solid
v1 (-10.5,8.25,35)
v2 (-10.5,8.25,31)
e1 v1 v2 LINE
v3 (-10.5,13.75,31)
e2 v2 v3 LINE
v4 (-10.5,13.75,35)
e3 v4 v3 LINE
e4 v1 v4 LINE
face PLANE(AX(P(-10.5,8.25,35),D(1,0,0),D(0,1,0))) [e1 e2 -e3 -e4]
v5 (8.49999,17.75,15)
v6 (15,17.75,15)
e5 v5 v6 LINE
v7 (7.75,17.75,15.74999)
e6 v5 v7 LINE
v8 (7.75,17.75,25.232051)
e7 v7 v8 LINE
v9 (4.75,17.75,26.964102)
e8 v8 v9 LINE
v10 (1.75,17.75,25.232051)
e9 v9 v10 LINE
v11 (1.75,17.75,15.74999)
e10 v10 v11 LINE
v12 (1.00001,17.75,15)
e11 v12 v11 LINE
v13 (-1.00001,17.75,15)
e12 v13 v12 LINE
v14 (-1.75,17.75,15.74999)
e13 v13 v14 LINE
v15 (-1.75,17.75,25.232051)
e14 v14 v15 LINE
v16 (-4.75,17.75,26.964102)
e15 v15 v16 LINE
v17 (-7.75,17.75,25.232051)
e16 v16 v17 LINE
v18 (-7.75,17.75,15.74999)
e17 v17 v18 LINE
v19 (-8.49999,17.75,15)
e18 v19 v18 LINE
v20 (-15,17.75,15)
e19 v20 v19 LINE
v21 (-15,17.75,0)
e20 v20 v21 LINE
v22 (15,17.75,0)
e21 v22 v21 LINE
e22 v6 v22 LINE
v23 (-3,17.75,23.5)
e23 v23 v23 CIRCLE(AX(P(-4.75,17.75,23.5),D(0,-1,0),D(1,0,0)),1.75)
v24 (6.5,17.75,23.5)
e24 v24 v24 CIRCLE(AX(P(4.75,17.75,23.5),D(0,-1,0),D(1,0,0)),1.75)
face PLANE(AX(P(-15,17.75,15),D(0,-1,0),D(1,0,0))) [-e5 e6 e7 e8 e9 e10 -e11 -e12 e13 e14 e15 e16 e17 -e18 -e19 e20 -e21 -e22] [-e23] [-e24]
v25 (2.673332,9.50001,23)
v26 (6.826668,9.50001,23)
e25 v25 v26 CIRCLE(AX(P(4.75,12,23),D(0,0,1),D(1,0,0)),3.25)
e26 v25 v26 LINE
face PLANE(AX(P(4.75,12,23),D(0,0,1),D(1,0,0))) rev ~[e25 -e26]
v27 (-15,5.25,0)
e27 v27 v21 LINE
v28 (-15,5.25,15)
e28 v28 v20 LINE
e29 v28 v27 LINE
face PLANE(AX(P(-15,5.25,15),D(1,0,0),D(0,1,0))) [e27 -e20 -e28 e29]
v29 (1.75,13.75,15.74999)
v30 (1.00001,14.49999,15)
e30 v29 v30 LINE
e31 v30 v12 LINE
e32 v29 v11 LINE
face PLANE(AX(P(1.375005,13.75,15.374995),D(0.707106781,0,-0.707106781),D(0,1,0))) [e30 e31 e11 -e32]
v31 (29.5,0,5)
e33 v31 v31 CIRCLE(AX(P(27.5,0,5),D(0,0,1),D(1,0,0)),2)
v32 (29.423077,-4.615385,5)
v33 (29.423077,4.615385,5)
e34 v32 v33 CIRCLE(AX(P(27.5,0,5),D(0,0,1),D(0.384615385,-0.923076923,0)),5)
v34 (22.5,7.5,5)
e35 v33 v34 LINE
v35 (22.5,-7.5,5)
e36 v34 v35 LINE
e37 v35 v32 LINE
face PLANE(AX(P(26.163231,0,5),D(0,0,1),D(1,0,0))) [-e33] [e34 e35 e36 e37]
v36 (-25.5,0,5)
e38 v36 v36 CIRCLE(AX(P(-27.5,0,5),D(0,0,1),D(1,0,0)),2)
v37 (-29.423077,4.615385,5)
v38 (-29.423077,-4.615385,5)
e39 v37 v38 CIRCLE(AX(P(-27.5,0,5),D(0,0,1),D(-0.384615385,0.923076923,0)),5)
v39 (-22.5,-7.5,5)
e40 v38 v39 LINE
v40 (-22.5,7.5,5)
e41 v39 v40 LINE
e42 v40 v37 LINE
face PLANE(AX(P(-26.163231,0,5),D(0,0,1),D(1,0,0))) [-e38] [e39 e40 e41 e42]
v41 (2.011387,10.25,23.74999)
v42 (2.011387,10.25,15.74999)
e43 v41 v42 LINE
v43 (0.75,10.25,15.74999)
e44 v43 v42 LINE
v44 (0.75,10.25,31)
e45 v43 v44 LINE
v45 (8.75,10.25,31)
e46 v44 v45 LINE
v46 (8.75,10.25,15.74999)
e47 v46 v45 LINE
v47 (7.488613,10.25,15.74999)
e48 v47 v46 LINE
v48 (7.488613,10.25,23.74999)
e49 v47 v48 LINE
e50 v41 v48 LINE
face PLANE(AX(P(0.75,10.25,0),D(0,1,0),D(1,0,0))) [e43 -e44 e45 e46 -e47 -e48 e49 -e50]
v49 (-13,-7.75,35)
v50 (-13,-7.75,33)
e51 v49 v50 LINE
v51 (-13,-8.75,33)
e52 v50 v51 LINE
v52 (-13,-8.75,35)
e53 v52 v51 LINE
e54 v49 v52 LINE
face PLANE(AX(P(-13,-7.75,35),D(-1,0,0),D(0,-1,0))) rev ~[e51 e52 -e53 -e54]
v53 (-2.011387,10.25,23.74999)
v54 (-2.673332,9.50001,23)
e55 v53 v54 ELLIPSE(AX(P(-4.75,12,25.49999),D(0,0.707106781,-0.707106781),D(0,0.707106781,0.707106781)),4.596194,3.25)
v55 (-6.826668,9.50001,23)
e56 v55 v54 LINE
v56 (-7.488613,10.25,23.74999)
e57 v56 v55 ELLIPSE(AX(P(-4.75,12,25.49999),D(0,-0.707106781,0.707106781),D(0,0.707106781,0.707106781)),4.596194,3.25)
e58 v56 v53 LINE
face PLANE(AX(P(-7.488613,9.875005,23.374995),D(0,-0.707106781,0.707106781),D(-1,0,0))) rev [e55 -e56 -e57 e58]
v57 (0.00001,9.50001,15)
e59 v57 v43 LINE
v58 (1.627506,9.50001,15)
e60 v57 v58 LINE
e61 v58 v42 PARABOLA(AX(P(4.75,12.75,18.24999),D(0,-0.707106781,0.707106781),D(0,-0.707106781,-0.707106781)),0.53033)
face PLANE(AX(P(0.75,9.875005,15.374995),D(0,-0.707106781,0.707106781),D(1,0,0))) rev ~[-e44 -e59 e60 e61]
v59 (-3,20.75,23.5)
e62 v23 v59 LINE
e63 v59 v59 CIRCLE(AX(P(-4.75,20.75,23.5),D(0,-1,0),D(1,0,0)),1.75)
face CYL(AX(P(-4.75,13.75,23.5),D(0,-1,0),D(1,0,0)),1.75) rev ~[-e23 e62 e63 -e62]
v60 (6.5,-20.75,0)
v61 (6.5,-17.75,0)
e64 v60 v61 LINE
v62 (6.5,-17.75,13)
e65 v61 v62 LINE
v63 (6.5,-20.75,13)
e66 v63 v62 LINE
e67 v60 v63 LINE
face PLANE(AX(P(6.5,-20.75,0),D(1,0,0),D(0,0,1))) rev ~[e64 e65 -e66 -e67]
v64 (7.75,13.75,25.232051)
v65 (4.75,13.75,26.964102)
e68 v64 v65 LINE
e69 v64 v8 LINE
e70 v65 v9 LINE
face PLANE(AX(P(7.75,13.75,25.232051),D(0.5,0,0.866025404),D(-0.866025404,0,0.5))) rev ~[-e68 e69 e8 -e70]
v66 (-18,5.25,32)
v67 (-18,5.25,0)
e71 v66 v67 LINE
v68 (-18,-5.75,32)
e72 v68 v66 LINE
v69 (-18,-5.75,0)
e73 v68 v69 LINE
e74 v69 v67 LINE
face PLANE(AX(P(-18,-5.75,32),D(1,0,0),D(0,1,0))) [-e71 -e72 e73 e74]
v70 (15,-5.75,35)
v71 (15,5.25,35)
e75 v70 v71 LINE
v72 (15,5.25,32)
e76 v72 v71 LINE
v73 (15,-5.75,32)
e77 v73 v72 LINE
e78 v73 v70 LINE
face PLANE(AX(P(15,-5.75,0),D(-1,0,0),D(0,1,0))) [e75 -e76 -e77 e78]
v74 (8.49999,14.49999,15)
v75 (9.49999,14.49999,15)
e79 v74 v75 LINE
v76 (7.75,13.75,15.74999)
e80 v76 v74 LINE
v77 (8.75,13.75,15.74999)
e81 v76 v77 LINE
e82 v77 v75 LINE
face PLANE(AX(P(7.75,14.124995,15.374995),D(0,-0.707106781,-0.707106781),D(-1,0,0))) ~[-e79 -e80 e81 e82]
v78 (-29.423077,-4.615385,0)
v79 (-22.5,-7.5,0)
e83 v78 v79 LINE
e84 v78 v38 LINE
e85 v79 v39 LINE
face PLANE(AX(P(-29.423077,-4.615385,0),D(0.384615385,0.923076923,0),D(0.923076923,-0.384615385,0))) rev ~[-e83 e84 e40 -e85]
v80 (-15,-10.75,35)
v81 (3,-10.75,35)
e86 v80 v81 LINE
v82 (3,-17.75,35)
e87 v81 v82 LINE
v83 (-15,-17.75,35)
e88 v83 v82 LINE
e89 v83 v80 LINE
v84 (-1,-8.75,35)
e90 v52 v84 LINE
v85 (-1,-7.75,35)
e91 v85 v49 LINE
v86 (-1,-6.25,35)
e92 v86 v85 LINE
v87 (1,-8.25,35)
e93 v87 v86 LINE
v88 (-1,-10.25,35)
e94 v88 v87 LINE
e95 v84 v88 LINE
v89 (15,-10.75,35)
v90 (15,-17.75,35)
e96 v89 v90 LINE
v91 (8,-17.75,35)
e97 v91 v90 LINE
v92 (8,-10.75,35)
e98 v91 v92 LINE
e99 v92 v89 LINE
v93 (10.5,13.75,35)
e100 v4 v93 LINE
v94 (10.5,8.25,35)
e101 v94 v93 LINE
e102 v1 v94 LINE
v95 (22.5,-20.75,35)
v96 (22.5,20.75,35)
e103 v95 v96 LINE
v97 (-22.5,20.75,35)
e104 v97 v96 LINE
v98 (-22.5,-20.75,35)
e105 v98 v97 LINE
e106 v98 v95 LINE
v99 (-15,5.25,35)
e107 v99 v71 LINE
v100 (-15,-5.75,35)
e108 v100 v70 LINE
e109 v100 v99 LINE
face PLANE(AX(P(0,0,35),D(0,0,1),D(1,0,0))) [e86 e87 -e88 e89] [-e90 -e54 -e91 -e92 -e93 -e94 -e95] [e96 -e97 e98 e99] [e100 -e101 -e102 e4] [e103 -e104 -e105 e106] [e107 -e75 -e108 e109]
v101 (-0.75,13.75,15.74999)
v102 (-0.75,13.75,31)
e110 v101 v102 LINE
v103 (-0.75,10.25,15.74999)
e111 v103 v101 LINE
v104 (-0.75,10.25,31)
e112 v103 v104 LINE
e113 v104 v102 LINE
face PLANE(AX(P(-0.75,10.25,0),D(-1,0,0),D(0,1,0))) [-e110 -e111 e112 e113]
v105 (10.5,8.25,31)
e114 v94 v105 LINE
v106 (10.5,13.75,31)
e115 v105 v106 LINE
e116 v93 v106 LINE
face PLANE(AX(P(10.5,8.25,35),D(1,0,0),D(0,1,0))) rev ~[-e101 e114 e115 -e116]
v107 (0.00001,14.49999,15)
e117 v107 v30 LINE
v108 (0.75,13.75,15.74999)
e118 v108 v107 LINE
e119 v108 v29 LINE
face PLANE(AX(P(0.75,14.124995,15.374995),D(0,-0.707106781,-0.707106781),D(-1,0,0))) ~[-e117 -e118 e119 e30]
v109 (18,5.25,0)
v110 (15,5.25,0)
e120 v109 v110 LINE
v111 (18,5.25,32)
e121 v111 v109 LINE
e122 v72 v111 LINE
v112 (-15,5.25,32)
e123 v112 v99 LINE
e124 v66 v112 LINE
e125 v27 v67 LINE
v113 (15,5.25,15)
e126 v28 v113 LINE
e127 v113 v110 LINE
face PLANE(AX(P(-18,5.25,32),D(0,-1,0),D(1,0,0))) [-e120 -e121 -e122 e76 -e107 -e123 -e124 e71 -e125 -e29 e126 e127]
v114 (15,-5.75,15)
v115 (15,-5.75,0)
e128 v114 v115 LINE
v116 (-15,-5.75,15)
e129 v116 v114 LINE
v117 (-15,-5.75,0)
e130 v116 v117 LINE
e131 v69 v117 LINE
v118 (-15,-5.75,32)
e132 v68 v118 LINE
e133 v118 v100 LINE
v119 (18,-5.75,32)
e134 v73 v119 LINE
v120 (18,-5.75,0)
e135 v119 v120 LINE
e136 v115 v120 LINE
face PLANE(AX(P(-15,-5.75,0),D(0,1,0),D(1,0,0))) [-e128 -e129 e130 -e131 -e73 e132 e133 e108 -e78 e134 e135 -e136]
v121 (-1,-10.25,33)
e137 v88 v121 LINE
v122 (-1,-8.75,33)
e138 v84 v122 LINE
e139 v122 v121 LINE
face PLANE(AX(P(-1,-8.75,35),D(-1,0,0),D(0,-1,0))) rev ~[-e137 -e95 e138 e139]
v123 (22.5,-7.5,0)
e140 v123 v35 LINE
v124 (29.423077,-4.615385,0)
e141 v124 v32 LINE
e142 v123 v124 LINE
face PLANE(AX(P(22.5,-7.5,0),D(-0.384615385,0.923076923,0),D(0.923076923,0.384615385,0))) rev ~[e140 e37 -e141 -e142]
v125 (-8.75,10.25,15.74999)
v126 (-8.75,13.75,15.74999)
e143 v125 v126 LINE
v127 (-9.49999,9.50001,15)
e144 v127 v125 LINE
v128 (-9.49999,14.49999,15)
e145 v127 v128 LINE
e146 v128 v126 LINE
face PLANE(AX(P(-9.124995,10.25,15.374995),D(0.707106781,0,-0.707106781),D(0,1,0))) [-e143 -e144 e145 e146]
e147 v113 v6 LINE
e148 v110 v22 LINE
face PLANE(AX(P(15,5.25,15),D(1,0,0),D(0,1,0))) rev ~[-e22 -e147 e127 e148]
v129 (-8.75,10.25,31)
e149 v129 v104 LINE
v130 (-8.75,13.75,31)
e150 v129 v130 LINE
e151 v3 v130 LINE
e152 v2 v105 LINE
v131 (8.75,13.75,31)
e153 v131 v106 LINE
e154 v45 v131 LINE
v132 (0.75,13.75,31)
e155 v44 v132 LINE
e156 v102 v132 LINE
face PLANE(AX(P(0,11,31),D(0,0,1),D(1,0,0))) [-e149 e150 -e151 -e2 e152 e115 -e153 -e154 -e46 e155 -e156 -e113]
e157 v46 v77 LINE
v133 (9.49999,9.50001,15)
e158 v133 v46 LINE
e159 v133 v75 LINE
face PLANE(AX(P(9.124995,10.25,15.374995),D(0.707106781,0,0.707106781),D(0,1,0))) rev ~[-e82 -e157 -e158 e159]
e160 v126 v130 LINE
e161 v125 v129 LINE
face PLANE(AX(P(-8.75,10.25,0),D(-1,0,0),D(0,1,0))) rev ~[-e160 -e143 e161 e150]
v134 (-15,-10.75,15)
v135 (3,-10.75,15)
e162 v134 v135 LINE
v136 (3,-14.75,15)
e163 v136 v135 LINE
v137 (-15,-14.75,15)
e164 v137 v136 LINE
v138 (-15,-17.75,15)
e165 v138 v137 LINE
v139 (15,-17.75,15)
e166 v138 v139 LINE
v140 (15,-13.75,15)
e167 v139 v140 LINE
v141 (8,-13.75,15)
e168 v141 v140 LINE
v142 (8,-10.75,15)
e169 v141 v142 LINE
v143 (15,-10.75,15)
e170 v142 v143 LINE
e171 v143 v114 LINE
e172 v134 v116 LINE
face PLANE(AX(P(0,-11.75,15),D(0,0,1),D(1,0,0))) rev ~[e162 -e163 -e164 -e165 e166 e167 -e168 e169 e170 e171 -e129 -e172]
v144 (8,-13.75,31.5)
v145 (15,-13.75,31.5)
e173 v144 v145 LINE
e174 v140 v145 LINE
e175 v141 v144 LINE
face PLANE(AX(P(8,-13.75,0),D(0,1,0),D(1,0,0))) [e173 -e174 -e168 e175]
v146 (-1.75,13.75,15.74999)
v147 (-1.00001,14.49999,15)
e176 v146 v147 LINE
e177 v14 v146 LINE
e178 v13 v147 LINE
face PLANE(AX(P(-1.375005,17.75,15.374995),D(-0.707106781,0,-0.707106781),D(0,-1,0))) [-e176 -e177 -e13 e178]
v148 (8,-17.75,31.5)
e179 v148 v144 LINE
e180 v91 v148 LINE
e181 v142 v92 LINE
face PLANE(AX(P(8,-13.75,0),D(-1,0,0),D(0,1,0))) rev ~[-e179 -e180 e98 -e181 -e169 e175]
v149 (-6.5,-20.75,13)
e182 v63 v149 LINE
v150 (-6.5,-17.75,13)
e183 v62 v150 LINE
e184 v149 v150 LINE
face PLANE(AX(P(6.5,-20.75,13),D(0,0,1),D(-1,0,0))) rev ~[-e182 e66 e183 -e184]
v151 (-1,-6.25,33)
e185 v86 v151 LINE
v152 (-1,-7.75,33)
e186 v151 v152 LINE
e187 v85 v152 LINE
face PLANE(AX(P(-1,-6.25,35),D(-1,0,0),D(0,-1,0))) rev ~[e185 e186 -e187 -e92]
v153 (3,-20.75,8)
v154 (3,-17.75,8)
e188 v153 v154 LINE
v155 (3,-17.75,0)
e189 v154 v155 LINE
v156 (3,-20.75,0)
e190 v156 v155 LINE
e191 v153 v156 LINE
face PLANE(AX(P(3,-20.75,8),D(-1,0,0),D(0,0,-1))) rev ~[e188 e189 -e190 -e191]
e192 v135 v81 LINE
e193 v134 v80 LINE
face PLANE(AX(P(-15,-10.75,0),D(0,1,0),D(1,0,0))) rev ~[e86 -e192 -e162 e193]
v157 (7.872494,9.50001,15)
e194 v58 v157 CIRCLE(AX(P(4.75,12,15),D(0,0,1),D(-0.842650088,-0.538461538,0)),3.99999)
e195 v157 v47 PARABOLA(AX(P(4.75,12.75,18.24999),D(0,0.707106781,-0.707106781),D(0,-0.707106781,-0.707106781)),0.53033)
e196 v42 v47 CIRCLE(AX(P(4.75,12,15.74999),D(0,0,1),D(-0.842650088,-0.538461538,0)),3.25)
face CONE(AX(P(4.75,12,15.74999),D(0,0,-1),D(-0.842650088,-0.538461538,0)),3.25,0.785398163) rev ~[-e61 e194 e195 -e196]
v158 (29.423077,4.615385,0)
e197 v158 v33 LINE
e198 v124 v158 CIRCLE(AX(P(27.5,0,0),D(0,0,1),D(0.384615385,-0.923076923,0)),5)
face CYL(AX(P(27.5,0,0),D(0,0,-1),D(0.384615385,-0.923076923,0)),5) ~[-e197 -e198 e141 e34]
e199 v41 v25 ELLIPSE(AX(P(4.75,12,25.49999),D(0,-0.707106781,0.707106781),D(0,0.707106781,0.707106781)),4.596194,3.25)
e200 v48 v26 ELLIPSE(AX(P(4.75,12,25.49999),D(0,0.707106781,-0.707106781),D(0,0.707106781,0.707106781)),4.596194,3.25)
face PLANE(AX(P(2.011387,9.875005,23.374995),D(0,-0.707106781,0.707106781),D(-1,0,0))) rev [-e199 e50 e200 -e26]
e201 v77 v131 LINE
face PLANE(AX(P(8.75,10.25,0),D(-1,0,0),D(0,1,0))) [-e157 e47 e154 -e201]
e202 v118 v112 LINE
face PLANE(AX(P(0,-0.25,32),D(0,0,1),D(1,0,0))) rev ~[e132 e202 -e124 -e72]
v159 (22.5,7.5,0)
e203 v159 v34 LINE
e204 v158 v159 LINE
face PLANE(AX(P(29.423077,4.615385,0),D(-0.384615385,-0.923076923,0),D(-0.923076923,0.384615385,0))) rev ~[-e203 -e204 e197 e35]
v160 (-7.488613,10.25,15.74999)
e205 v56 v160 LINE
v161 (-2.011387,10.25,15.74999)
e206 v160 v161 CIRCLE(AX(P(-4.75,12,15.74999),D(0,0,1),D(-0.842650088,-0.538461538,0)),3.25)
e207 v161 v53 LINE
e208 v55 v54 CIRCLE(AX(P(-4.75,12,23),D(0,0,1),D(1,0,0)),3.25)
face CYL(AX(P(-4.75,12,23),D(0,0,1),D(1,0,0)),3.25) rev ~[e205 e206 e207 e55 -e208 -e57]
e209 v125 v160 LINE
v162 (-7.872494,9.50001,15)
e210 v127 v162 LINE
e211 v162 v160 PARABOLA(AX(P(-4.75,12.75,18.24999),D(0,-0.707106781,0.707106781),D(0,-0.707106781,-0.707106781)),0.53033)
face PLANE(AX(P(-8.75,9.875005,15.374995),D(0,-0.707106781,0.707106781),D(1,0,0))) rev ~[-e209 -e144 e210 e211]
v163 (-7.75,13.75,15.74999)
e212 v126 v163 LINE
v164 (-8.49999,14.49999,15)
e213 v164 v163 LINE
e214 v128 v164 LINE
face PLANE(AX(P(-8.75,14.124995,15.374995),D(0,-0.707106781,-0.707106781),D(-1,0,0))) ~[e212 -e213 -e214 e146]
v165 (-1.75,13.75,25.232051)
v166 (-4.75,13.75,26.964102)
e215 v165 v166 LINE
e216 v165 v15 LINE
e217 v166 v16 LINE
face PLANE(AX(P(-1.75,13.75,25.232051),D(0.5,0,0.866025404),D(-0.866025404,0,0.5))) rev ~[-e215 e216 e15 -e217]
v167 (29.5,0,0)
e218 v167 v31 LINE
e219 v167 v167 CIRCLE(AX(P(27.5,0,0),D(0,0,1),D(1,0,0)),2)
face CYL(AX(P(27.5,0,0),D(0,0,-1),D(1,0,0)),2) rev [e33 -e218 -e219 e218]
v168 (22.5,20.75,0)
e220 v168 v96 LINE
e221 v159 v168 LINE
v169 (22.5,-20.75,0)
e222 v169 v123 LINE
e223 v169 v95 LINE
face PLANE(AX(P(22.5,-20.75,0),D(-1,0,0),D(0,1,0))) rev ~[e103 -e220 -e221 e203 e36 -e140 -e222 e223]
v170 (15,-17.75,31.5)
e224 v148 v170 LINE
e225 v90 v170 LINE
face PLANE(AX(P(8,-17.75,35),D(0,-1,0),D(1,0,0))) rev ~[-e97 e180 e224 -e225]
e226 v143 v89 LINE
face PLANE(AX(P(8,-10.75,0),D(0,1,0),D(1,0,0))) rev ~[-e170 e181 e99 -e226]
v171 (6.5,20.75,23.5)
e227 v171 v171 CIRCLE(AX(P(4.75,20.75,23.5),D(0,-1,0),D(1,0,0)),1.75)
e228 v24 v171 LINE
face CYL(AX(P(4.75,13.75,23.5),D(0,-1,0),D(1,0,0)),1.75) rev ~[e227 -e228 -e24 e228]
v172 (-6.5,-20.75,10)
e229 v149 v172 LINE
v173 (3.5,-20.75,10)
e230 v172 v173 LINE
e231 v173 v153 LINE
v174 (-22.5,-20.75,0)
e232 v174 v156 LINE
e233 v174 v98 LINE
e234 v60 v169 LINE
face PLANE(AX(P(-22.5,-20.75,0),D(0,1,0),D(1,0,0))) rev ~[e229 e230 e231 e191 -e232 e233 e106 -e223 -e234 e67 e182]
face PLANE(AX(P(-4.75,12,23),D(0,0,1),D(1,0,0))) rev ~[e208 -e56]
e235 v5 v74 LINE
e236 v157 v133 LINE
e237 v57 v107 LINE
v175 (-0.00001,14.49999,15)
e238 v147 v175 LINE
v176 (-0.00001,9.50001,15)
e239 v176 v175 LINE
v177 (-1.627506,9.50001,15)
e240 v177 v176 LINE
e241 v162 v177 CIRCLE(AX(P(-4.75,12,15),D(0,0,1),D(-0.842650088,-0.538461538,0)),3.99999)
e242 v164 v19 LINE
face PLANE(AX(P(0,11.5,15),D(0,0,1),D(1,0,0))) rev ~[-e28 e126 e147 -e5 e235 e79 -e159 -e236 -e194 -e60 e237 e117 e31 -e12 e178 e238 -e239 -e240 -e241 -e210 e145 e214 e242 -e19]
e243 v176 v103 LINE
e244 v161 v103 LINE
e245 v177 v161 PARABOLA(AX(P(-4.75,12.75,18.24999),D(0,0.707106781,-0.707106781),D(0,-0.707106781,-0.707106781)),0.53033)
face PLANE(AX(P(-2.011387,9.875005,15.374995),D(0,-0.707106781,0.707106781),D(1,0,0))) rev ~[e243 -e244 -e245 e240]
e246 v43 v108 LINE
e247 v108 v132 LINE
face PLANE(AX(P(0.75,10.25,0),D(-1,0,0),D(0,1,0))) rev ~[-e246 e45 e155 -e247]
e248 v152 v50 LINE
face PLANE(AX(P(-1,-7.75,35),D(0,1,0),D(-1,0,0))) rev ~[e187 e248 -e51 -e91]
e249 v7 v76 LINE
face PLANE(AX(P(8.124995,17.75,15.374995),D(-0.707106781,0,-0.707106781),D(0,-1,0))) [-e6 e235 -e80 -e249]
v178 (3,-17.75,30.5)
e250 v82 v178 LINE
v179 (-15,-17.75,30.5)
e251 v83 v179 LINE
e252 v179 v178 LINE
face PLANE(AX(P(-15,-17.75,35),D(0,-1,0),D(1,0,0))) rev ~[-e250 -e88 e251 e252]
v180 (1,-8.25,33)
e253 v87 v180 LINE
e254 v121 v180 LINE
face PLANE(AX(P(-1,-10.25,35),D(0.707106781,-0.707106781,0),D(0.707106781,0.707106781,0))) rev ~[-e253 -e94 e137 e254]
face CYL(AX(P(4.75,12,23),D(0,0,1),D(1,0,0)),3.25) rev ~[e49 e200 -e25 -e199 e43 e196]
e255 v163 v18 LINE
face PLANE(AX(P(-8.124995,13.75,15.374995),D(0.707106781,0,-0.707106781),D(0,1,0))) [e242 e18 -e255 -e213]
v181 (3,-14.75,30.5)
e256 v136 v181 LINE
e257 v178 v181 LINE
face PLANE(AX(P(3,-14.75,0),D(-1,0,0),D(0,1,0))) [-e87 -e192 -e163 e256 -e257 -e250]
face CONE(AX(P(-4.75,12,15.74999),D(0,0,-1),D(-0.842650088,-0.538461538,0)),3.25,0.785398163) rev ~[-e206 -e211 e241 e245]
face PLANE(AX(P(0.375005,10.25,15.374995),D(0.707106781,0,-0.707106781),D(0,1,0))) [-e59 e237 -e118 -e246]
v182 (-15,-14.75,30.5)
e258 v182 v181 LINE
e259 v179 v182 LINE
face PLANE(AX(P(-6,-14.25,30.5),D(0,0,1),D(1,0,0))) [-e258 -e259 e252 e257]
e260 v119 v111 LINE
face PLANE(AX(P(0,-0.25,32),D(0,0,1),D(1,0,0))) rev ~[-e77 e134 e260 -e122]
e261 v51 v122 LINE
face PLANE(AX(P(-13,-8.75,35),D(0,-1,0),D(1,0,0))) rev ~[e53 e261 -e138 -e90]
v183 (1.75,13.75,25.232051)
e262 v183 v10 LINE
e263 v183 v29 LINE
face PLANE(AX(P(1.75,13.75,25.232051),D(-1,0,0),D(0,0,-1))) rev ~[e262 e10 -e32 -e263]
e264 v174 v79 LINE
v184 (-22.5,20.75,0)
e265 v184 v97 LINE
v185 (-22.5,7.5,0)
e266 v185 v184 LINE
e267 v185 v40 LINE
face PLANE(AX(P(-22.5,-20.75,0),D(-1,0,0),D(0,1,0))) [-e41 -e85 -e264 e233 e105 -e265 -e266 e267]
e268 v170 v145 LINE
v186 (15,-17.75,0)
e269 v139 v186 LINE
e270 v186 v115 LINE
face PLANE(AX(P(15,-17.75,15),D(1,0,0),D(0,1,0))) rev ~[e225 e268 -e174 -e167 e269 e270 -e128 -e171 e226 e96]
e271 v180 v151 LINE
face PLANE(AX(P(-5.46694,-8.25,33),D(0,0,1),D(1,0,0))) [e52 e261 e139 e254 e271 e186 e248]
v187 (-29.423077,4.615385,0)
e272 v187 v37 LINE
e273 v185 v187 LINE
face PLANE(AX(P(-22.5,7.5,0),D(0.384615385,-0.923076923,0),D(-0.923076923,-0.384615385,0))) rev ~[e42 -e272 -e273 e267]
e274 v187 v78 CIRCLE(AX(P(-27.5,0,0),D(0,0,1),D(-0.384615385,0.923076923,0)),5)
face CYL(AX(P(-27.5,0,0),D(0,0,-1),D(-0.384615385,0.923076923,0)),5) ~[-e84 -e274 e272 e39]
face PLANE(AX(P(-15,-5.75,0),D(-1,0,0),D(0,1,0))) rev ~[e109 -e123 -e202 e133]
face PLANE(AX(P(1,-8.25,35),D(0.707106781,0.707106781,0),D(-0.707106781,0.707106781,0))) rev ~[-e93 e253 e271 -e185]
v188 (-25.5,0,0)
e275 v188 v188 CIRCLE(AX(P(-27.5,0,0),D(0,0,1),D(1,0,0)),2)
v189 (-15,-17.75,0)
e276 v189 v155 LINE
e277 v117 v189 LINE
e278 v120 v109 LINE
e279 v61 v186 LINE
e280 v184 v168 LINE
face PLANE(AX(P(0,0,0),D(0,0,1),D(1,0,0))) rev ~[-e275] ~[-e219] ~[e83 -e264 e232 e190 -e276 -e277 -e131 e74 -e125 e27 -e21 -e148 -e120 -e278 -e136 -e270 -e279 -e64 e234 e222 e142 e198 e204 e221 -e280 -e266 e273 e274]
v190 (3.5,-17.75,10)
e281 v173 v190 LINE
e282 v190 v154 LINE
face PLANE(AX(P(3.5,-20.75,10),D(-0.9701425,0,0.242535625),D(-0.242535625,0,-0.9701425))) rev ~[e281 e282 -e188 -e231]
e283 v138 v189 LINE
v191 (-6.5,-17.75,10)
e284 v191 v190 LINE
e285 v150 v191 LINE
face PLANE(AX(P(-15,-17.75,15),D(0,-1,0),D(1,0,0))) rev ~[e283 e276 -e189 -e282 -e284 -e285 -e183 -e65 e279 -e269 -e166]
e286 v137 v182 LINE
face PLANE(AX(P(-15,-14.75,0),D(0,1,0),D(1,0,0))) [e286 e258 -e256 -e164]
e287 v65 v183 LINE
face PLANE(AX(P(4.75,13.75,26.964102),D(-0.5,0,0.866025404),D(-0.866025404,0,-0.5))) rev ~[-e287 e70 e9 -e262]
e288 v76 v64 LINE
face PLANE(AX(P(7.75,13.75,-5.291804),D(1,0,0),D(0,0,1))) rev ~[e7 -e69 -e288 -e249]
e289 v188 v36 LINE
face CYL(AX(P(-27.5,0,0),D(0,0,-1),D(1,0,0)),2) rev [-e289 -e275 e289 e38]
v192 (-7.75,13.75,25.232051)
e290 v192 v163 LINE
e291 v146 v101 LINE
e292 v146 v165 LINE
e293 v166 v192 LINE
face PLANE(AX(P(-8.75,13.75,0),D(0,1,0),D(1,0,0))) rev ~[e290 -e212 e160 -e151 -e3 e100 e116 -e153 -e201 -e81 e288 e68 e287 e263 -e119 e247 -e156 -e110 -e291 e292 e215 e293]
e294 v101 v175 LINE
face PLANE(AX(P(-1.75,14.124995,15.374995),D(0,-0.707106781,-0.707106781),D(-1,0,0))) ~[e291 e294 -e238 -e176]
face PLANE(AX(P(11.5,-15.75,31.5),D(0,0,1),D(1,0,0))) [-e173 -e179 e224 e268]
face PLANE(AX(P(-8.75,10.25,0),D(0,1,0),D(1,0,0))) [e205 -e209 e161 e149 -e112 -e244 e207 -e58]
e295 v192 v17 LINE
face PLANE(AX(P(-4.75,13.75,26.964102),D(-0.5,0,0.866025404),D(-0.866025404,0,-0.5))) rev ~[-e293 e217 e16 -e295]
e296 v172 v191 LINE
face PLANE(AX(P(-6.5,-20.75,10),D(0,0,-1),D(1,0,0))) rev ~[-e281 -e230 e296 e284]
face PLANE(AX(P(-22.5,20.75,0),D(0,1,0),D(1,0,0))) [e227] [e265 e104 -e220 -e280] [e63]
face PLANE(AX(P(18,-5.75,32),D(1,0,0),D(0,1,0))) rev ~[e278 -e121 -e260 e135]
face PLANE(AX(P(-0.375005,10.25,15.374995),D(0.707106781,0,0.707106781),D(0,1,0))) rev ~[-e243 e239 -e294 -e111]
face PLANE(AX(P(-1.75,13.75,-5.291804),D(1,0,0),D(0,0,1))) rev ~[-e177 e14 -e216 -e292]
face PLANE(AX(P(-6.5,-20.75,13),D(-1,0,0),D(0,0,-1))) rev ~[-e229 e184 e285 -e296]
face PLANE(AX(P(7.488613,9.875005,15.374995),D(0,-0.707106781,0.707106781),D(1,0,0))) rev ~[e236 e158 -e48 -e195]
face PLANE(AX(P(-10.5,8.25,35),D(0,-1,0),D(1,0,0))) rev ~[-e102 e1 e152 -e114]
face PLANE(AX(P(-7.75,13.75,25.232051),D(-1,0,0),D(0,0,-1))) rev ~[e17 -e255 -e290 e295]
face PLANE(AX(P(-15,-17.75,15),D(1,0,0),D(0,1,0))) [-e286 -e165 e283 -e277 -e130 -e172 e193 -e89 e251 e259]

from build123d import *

# Parameters (mm, degrees)
F0_W      = 45
F0_H      = 41.5
F0_W_2    = 18
F0_H_2    = 4
F0_W_3    = 7
F0_H_3    = 3
F0_W_4    = 30
F0_H_4    = 11
F0_W_5    = 8
F0_H_5    = 3.5
F1_DEPTH  = 35
F2_W      = 21
F2_H      = 5.5
F3_DEPTH  = 4
F4_R      = 1.75
F5_DEPTH  = 25
F7_DEPTH  = 4
F9_START  = -8
F8_R      = 3.25
F9_DEPTH  = 17
F11_START = -3
F10_W     = 36
F10_H     = 11
F11_DEPTH = 32.001
F12_W     = 18
F12_H     = 7
F13_DEPTH = 4.5
F14_W     = 7
F14_H     = 4
F15_DEPTH = 3.5
F17_START = -20
F16_W     = 30
F16_H     = 12.5
F16_H_2   = 12
F17_DEPTH = 15.001
F19_DEPTH = 2
F20_R     = 2
F21_DEPTH = 5
F23_DEPTH = 10
F24_SIZE  = 0.74999


# Not quite as in the source:
# - a fillet or chamfer is up to 0.001 mm smaller than in the source, because OpenCascade refuses the exact size


with BuildPart() as f1:
    # F0 (on Top) → F1 (new body)
    with BuildSketch(Plane.XY):
        Rectangle(F0_W, F0_H)
        with Locations((-6, -12.75)):
            Rectangle(F0_W_2, F0_H_2, mode=Mode.SUBTRACT)
        with Locations((11.5, -12.25)):
            Rectangle(F0_W_3, F0_H_3, mode=Mode.SUBTRACT)
        with Locations((0, -0.25)):
            Rectangle(F0_W_4, F0_H_4, mode=Mode.SUBTRACT)
        with Locations((-4.75, 12)):
            Rectangle(F0_W_5, F0_H_5, mode=Mode.SUBTRACT)
        with Locations((4.75, 12)):
            Rectangle(F0_W_5, F0_H_5, mode=Mode.SUBTRACT)
    extrude(amount=F1_DEPTH)

    # F2 (on face) → F3 (cut)
    with BuildSketch(Plane.XY.offset(35)):
        with Locations((0, 11)):
            Rectangle(F2_W, F2_H)
    extrude(amount=-F3_DEPTH, mode=Mode.SUBTRACT)

    # F4 (on face) → F5 (cut)
    with BuildSketch(Plane.XZ.offset(-13.75)):
        with Locations((4.75, 23.5)):
            Circle(F4_R)
        with Locations((-4.75, 23.5)):
            Circle(F4_R)
    extrude(amount=-F5_DEPTH, mode=Mode.SUBTRACT)

    # F6 (on face) → F7 (cut)
    with BuildSketch(Plane.XZ.offset(-13.75)):
        Polygon((4.75, 26.9641016151), (1.75, 25.2320508076), (1.75, 21.7679491924), (1.75, -5.2918036282), (7.75, -5.2918036282), (7.75, 21.7679491924), (7.75, 25.2320508076), align=None)
        Polygon((-1.75, 21.7679491924), (-1.75, 25.2320508076), (-4.75, 26.9641016151), (-7.75, 25.2320508076), (-7.75, 21.7679491924), (-7.75, -5.2918036282), (-1.75, -5.2918036282), align=None)
    extrude(amount=-F7_DEPTH, mode=Mode.SUBTRACT)

    # F8 (on face) → F9 (cut)
    with BuildSketch(Plane.XY.offset(31).offset(F9_START)):
        with Locations((4.75, 12)):
            Circle(F8_R)
        with Locations((-4.75, 12)):
            Circle(F8_R)
    extrude(amount=-F9_DEPTH, mode=Mode.SUBTRACT)

    # F10 (on face) → F11 (cut)
    with BuildSketch(Plane.XY.offset(35).offset(F11_START)):
        with Locations((0, -0.25)):
            Rectangle(F10_W, F10_H)
    extrude(amount=-F11_DEPTH, mode=Mode.SUBTRACT)

    # F12 (on face) → F13 (cut)
    with BuildSketch(Plane.XY.offset(35)):
        with Locations((-6, -14.25)):
            Rectangle(F12_W, F12_H)
    extrude(amount=-F13_DEPTH, mode=Mode.SUBTRACT)

    # F14 (on face) → F15 (cut)
    with BuildSketch(Plane.XY.offset(35)):
        with Locations((11.5, -15.75)):
            Rectangle(F14_W, F14_H)
    extrude(amount=-F15_DEPTH, mode=Mode.SUBTRACT)

    # F16 (on face) → F17 (cut)
    with BuildSketch(Plane.XY.offset(35).offset(F17_START)):
        with Locations((0, 11.5)):
            Rectangle(F16_W, F16_H)
        with Locations((0, -11.75)):
            Rectangle(F16_W, F16_H_2)
    extrude(amount=-F17_DEPTH, mode=Mode.SUBTRACT)

    # F18 (on face) → F19 (cut)
    with BuildSketch(Plane.XY.offset(35)):
        Polygon((-1, -7.75), (-13, -7.75), (-13, -8.75), (-1, -8.75), (-1, -10.25), (1, -8.25), (-1, -6.25), align=None)
    extrude(amount=-F19_DEPTH, mode=Mode.SUBTRACT)

    # F20 (on Top) → F21 (join)
    with BuildSketch(Plane.XY):
        with BuildLine():
            Line((22.5, -7.5), (29.4230769231, -4.6153846154))
            ThreePointArc((29.4230769231, -4.6153846154), (32.5, 0), (29.4230769231, 4.6153846154))
            Line((29.4230769231, 4.6153846154), (22.5, 7.5))
            Line((22.5, 7.5), (22.5, -7.5))
        make_face()
        with Locations((27.5, 0)):
            Circle(F20_R, mode=Mode.SUBTRACT)
        with BuildLine():
            Line((-29.4230769231, -4.6153846154), (-22.5, -7.5))
            Line((-22.5, -7.5), (-22.5, 7.5))
            Line((-22.5, 7.5), (-29.4230769231, 4.6153846154))
            ThreePointArc((-29.4230769231, 4.6153846154), (-32.5, 0), (-29.4230769231, -4.6153846154))
        make_face()
        with Locations((-27.5, 0)):
            Circle(F20_R, mode=Mode.SUBTRACT)
    extrude(amount=F21_DEPTH)

    # F22 (on face) → F23 (cut)
    with BuildSketch(Plane.XZ.offset(20.75)):
        Polygon((3, 8), (3, 0), (6.5, 0), (6.5, 13), (-6.5, 13), (-6.5, 10), (3.5, 10), align=None)
    extrude(amount=-F23_DEPTH, mode=Mode.SUBTRACT)

    # F24 (size 0.75 in the source; OpenCascade refuses exactly that, so slightly less here)
    f24_edges = [f1.edges().sort_by_distance(p)[0] for p in [
        (-7.75, 15.75, 15),
        (-4.75, 8.75, 15),
        (8.119306, 10.25, 15),
        (1.380694, 10.25, 15),
        (-1.380694, 10.25, 15),
        (-8.119306, 10.25, 15),
        (-8.75, 12, 15),
        (-8.25, 13.75, 15),
        (-1.25, 13.75, 15),
        (1.25, 13.75, 15),
        (8.25, 13.75, 15),
        (-1.75, 15.75, 15),
        (1.75, 15.75, 15),
        (4.75, 8.75, 15),
        (8.75, 12, 15),
        (7.75, 15.75, 15),
        (-0.75, 12, 15),
        (0.75, 12, 15),
        (4.75, 10.25, 23),
        (-4.75, 10.25, 23),
    ]]
    chamfer(f24_edges, length=F24_SIZE)


solid = f1.part
